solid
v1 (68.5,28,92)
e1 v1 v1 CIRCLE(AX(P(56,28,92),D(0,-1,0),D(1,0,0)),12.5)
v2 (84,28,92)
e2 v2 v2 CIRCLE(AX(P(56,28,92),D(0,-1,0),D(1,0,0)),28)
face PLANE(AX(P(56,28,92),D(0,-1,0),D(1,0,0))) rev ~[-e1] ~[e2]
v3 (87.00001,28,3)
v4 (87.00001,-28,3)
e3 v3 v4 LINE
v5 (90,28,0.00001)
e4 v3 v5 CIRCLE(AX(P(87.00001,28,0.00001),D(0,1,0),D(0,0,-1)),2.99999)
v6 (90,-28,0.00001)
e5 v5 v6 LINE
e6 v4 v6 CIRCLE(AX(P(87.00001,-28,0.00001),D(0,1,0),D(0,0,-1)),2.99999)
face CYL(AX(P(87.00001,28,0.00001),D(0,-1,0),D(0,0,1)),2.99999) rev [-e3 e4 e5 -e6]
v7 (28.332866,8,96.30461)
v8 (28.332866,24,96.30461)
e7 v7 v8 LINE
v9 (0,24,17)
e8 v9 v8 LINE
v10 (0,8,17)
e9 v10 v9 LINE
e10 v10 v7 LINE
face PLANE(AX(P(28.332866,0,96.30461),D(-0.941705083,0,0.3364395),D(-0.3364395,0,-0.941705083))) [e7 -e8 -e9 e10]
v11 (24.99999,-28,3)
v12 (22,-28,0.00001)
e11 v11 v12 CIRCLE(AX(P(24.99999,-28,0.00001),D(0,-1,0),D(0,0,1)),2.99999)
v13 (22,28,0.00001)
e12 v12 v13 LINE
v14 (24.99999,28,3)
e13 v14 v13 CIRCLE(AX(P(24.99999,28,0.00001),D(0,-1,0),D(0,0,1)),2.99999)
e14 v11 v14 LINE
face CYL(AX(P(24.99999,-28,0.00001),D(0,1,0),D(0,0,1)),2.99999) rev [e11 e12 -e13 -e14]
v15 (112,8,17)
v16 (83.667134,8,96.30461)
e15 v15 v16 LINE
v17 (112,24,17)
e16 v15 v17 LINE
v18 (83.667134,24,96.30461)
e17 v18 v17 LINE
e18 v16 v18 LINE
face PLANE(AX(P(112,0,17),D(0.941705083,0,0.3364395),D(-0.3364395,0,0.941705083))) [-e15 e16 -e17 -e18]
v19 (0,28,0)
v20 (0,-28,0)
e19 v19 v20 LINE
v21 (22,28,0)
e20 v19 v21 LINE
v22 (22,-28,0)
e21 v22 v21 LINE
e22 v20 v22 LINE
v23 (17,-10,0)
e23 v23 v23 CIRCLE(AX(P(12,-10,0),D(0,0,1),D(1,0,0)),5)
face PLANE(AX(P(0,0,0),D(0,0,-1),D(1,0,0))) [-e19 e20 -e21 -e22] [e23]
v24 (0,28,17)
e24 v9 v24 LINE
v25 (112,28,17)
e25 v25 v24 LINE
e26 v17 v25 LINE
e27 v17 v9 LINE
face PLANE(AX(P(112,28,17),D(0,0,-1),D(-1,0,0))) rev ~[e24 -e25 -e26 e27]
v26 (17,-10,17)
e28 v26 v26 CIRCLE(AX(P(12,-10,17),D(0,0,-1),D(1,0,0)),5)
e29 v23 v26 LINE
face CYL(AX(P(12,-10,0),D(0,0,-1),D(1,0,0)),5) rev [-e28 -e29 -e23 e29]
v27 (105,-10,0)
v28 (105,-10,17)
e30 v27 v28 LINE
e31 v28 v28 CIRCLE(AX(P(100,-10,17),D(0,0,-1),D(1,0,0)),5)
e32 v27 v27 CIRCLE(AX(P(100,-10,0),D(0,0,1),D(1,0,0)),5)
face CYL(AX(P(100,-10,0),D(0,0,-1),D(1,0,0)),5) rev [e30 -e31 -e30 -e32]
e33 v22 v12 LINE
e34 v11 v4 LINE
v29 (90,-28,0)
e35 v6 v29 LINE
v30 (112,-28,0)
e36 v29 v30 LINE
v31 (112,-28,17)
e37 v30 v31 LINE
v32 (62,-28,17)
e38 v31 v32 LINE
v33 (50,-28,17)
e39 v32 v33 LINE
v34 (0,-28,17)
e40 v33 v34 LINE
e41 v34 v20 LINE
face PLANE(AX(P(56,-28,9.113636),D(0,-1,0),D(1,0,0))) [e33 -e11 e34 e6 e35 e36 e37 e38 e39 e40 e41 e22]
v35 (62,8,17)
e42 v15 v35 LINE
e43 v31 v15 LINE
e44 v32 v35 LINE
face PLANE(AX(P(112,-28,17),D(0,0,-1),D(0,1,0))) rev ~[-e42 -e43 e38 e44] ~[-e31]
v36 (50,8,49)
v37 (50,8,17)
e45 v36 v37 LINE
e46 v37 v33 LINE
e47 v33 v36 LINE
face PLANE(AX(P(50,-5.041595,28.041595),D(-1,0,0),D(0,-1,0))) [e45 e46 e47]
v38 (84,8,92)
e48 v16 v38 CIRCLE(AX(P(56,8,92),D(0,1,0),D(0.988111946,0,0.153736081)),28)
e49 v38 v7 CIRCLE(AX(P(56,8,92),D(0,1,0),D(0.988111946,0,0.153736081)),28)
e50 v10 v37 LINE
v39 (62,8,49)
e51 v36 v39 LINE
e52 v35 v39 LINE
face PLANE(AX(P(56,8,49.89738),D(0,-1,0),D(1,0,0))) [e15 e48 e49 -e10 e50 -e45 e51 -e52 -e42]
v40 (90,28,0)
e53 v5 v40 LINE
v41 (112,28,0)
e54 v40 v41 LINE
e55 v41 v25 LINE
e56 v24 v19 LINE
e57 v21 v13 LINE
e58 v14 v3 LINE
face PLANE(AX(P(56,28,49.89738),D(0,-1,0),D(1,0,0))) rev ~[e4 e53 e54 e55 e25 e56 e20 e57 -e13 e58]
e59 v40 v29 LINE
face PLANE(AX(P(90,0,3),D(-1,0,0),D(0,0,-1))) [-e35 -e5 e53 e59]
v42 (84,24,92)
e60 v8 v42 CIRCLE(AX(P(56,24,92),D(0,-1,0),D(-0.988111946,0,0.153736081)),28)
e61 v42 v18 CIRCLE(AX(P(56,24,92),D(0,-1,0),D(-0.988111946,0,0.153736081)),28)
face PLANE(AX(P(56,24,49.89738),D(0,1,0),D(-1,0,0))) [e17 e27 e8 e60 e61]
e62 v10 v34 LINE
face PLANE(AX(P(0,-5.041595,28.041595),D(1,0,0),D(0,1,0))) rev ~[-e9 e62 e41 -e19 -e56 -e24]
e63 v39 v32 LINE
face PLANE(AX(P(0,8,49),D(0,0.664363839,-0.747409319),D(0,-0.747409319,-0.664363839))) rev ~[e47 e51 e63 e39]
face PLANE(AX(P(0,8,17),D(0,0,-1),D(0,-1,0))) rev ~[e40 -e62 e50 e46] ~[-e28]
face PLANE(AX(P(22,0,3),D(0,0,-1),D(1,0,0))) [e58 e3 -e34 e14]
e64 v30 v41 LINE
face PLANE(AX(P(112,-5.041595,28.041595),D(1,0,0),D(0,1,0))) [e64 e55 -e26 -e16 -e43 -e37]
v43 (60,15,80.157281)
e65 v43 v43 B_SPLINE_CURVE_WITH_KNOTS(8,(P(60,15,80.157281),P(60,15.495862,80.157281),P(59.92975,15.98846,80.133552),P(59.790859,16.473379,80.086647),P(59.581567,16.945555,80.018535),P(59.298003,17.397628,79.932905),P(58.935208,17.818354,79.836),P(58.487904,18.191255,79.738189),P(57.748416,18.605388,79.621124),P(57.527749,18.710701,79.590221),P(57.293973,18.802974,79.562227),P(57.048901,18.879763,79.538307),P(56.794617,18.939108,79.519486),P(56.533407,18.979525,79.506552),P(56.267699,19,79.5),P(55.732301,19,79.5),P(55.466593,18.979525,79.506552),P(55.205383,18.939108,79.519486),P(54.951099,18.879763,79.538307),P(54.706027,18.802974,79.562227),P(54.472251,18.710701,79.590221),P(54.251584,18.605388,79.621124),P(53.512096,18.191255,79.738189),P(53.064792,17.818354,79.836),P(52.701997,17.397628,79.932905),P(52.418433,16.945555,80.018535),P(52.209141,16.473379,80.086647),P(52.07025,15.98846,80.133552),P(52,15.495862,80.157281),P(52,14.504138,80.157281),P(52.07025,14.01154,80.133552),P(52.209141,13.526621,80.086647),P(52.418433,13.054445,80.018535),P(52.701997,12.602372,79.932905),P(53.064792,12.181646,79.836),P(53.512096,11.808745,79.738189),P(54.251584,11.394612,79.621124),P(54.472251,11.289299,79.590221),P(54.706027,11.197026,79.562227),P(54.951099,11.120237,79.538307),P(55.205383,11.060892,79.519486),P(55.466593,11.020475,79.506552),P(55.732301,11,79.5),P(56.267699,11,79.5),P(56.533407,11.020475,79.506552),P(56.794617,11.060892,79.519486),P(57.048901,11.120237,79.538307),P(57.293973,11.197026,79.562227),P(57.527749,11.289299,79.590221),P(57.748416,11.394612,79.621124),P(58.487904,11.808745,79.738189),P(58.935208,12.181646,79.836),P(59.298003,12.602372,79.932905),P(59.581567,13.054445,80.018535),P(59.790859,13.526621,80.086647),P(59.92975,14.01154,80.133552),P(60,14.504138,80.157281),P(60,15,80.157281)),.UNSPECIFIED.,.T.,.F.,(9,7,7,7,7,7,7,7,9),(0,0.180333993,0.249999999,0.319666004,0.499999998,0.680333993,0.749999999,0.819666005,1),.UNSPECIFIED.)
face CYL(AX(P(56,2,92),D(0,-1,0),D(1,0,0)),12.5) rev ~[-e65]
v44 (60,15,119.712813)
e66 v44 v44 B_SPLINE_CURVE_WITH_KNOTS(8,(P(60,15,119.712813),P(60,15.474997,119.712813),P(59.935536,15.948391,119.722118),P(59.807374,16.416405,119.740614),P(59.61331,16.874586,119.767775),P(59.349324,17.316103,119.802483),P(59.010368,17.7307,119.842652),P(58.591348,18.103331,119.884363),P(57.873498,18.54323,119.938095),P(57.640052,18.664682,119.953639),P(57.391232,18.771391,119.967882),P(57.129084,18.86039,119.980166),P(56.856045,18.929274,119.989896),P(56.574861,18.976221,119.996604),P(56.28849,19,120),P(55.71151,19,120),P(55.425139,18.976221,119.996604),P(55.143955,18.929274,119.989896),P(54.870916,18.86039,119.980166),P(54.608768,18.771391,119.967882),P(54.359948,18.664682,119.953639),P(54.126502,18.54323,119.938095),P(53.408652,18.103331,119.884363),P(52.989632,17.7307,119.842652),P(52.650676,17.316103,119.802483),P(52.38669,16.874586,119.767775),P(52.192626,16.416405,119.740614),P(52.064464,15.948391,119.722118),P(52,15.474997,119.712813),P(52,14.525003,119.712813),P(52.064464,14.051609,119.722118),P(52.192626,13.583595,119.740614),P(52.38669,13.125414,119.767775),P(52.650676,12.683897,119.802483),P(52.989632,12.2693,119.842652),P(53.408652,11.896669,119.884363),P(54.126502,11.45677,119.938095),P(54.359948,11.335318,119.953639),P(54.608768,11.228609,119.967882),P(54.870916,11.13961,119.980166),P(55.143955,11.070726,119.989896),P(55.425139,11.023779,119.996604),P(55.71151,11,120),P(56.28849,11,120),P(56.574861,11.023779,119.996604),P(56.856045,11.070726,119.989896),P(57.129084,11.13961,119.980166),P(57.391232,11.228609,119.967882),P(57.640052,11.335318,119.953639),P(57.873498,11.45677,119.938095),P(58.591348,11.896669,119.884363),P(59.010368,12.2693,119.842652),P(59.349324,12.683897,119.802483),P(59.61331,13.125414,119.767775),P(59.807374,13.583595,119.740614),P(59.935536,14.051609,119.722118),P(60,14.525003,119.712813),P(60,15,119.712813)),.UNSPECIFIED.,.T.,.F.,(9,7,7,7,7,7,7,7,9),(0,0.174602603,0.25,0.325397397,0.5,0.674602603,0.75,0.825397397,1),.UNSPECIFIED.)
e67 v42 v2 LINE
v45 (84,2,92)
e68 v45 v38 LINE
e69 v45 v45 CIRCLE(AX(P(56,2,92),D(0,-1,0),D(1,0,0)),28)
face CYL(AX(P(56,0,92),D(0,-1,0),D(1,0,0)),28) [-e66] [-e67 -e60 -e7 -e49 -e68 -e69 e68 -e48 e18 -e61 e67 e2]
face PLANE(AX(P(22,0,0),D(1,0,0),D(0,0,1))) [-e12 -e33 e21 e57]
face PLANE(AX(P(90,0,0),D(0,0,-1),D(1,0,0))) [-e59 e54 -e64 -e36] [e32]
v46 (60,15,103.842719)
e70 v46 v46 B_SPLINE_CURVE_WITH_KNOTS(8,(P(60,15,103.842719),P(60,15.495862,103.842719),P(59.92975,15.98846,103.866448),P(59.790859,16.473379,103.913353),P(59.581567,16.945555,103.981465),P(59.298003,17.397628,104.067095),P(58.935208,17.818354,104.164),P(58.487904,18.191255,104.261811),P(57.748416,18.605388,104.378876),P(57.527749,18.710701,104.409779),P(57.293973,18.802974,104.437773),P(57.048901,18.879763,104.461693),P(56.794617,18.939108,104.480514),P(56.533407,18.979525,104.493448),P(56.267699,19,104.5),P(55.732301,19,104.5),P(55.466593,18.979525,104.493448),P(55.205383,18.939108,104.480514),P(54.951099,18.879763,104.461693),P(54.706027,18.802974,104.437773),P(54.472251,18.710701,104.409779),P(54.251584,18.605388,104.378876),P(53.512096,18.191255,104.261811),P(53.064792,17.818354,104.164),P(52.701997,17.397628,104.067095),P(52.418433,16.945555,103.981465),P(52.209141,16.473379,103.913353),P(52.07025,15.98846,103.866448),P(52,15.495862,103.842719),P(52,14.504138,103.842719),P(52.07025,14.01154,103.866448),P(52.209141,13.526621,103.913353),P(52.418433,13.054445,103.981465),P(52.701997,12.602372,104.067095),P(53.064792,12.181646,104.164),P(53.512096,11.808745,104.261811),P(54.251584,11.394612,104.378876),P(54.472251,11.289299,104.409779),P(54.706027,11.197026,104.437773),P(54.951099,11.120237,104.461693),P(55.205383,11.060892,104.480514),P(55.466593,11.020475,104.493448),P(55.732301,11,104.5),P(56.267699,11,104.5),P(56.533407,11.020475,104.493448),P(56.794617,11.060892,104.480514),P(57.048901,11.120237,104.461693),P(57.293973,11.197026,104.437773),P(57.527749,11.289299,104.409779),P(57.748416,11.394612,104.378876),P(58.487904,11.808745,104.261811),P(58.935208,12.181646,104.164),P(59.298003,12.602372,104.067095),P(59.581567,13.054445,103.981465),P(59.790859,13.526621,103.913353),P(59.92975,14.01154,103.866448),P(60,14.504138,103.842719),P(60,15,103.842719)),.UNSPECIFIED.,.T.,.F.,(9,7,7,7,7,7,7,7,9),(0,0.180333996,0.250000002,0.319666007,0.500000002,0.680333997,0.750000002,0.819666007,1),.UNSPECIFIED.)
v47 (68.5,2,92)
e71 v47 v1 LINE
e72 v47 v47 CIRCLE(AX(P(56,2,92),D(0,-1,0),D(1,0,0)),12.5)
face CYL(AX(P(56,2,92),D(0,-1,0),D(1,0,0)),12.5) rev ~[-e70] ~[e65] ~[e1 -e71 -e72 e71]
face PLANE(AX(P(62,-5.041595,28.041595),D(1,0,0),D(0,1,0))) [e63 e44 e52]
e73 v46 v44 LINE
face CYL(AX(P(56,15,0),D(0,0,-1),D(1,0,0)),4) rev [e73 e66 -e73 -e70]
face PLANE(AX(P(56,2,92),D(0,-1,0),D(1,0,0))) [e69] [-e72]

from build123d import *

# Parameters (mm, degrees)
F1_DEPTH  = 28
F3_DEPTH  = 28
F5_DEPTH  = 8
F7_DEPTH  = 4
F8_R      = 28
F9_DEPTH  = 28
F10_R     = 28
F11_DEPTH = 2
F12_R     = 12.5
F13_DEPTH = 26.001
F15_DEPTH = 112
F17_DEPTH = 50
F19_DEPTH = 50
F20_R     = 4
F21_DEPTH = 139
F22_R     = 4
F23_DEPTH = 91
F24_R     = 12.5
F25_DEPTH = 26.0010001
F26_R     = 5
F27_DEPTH = 120.0010001
F28_W     = 68
F28_H     = 3
F29_DEPTH = 28.0010001
F30_R     = 2.99999


# Not quite as in the source:
# - a fillet or chamfer is up to 0.001 mm smaller than in the source, because OpenCascade refuses the exact size


with BuildPart() as f1:
    # F0 (on Front) → F1 (new body, symmetric)
    with BuildSketch(Plane.XZ):
        Polygon((0, 17), (0, 0), (22, 0), (22, 3), (90, 3), (90, 0), (112, 0), (112, 17), align=None)
    extrude(amount=F1_DEPTH, both=True)

    # F2 (on Front) → F3 (join)
    with BuildSketch(Plane.XZ):
        with BuildLine():
            Line((28.3328655167, 96.304610259), (0, 17))
            Line((0, 17), (112, 17))
            Line((112, 17), (83.6671344833, 96.304610259))
            ThreePointArc((83.6671344833, 96.304610259), (56, 64), (28.3328655167, 96.304610259))
        make_face()
    extrude(amount=-F3_DEPTH)

    # F4 (on face) → F5 (cut)
    with BuildSketch(Plane.XZ):
        with BuildLine():
            ThreePointArc((83.6671344833, 96.304610259), (56, 64), (28.3328655167, 96.304610259))
            Line((28.3328655167, 96.304610259), (0, 17))
            Line((0, 17), (112, 17))
            Line((112, 17), (83.6671344833, 96.304610259))
        make_face()
    extrude(amount=-F5_DEPTH, mode=Mode.SUBTRACT)

    # F6 (on face) → F7 (cut)
    with BuildSketch(Plane(origin=(0, 28, 0), x_dir=(-1, 0, 0), z_dir=(0, 1, 0))):
        with BuildLine():
            Line((-83.6671344833, 96.304610259), (-112, 17))
            Line((-112, 17), (0, 17))
            Line((0, 17), (-28.3328655167, 96.304610259))
            ThreePointArc((-28.3328655167, 96.304610259), (-56, 64), (-83.6671344833, 96.304610259))
        make_face()
    extrude(amount=-F7_DEPTH, mode=Mode.SUBTRACT)

    # F8 (on Front) → F9 (join)
    with BuildSketch(Plane.XZ):
        with Locations((56, 92)):
            Circle(F8_R)
    extrude(amount=-F9_DEPTH)

    # F10 (on face) → F11 (cut)
    with BuildSketch(Plane.XZ):
        with Locations((56, 92)):
            Circle(F10_R)
    extrude(amount=-F11_DEPTH, mode=Mode.SUBTRACT)

    # F12 (on face) → F13 (cut, through all)
    with BuildSketch(Plane.XZ.offset(-2)):
        with Locations((56, 92)):
            Circle(F12_R)
    extrude(amount=-F13_DEPTH, mode=Mode.SUBTRACT)

    # F14 (on Right) → F15 (join)
    with BuildSketch(Plane.YZ):
        Polygon((8, 49), (-28, 17), (8, 17), align=None)
    extrude(amount=F15_DEPTH)

    # F16 (on face) → F17 (cut)
    with BuildSketch(Plane.YZ.offset(112)):
        Polygon((8, 49), (-28, 17), (8, 17), align=None)
    extrude(amount=-F17_DEPTH, mode=Mode.SUBTRACT)

    # F18 (on face) → F19 (cut)
    with BuildSketch(Plane(origin=(0, 0, 0), x_dir=(0, -1, 0), z_dir=(-1, 0, 0))):
        Polygon((-8, 49), (-8, 17), (28, 17), align=None)
    extrude(amount=-F19_DEPTH, mode=Mode.SUBTRACT)

    # F20 (on Top) → F21 (cut)
    with BuildSketch(Plane.XY):
        with Locations((56, 15)):
            Circle(F20_R)
    extrude(amount=F21_DEPTH, mode=Mode.SUBTRACT)

    # F22 (on Top) → F23 (join)
    with BuildSketch(Plane.XY):
        with Locations((56, 15)):
            Circle(F22_R)
    extrude(amount=F23_DEPTH)

    # F24 (on face) → F25 (cut, through all)
    with BuildSketch(Plane.XZ.offset(-2)):
        with Locations((56, 92)):
            Circle(F24_R)
    extrude(amount=-F25_DEPTH, mode=Mode.SUBTRACT)

    # F26 (on Top) → F27 (cut, through all)
    with BuildSketch(Plane.XY):
        with Locations((12, -10)):
            Circle(F26_R)
        with Locations((100, -10)):
            Circle(F26_R)
    extrude(amount=F27_DEPTH, mode=Mode.SUBTRACT)

    # F28 (on Front) → F29 (cut, through all)
    with BuildSketch(Plane.XZ):
        with Locations((56, 1.5)):
            Rectangle(F28_W, F28_H)
    extrude(amount=-F29_DEPTH, mode=Mode.SUBTRACT)

    # F30 (radius 3 in the source; OpenCascade refuses exactly that, so slightly less here)
    f30_edges = [f1.edges().sort_by_distance(p)[0] for p in [
        (90, 0, 3),
        (22, 0, 3),
    ]]
    fillet(f30_edges, radius=F30_R)


solid = f1.part
